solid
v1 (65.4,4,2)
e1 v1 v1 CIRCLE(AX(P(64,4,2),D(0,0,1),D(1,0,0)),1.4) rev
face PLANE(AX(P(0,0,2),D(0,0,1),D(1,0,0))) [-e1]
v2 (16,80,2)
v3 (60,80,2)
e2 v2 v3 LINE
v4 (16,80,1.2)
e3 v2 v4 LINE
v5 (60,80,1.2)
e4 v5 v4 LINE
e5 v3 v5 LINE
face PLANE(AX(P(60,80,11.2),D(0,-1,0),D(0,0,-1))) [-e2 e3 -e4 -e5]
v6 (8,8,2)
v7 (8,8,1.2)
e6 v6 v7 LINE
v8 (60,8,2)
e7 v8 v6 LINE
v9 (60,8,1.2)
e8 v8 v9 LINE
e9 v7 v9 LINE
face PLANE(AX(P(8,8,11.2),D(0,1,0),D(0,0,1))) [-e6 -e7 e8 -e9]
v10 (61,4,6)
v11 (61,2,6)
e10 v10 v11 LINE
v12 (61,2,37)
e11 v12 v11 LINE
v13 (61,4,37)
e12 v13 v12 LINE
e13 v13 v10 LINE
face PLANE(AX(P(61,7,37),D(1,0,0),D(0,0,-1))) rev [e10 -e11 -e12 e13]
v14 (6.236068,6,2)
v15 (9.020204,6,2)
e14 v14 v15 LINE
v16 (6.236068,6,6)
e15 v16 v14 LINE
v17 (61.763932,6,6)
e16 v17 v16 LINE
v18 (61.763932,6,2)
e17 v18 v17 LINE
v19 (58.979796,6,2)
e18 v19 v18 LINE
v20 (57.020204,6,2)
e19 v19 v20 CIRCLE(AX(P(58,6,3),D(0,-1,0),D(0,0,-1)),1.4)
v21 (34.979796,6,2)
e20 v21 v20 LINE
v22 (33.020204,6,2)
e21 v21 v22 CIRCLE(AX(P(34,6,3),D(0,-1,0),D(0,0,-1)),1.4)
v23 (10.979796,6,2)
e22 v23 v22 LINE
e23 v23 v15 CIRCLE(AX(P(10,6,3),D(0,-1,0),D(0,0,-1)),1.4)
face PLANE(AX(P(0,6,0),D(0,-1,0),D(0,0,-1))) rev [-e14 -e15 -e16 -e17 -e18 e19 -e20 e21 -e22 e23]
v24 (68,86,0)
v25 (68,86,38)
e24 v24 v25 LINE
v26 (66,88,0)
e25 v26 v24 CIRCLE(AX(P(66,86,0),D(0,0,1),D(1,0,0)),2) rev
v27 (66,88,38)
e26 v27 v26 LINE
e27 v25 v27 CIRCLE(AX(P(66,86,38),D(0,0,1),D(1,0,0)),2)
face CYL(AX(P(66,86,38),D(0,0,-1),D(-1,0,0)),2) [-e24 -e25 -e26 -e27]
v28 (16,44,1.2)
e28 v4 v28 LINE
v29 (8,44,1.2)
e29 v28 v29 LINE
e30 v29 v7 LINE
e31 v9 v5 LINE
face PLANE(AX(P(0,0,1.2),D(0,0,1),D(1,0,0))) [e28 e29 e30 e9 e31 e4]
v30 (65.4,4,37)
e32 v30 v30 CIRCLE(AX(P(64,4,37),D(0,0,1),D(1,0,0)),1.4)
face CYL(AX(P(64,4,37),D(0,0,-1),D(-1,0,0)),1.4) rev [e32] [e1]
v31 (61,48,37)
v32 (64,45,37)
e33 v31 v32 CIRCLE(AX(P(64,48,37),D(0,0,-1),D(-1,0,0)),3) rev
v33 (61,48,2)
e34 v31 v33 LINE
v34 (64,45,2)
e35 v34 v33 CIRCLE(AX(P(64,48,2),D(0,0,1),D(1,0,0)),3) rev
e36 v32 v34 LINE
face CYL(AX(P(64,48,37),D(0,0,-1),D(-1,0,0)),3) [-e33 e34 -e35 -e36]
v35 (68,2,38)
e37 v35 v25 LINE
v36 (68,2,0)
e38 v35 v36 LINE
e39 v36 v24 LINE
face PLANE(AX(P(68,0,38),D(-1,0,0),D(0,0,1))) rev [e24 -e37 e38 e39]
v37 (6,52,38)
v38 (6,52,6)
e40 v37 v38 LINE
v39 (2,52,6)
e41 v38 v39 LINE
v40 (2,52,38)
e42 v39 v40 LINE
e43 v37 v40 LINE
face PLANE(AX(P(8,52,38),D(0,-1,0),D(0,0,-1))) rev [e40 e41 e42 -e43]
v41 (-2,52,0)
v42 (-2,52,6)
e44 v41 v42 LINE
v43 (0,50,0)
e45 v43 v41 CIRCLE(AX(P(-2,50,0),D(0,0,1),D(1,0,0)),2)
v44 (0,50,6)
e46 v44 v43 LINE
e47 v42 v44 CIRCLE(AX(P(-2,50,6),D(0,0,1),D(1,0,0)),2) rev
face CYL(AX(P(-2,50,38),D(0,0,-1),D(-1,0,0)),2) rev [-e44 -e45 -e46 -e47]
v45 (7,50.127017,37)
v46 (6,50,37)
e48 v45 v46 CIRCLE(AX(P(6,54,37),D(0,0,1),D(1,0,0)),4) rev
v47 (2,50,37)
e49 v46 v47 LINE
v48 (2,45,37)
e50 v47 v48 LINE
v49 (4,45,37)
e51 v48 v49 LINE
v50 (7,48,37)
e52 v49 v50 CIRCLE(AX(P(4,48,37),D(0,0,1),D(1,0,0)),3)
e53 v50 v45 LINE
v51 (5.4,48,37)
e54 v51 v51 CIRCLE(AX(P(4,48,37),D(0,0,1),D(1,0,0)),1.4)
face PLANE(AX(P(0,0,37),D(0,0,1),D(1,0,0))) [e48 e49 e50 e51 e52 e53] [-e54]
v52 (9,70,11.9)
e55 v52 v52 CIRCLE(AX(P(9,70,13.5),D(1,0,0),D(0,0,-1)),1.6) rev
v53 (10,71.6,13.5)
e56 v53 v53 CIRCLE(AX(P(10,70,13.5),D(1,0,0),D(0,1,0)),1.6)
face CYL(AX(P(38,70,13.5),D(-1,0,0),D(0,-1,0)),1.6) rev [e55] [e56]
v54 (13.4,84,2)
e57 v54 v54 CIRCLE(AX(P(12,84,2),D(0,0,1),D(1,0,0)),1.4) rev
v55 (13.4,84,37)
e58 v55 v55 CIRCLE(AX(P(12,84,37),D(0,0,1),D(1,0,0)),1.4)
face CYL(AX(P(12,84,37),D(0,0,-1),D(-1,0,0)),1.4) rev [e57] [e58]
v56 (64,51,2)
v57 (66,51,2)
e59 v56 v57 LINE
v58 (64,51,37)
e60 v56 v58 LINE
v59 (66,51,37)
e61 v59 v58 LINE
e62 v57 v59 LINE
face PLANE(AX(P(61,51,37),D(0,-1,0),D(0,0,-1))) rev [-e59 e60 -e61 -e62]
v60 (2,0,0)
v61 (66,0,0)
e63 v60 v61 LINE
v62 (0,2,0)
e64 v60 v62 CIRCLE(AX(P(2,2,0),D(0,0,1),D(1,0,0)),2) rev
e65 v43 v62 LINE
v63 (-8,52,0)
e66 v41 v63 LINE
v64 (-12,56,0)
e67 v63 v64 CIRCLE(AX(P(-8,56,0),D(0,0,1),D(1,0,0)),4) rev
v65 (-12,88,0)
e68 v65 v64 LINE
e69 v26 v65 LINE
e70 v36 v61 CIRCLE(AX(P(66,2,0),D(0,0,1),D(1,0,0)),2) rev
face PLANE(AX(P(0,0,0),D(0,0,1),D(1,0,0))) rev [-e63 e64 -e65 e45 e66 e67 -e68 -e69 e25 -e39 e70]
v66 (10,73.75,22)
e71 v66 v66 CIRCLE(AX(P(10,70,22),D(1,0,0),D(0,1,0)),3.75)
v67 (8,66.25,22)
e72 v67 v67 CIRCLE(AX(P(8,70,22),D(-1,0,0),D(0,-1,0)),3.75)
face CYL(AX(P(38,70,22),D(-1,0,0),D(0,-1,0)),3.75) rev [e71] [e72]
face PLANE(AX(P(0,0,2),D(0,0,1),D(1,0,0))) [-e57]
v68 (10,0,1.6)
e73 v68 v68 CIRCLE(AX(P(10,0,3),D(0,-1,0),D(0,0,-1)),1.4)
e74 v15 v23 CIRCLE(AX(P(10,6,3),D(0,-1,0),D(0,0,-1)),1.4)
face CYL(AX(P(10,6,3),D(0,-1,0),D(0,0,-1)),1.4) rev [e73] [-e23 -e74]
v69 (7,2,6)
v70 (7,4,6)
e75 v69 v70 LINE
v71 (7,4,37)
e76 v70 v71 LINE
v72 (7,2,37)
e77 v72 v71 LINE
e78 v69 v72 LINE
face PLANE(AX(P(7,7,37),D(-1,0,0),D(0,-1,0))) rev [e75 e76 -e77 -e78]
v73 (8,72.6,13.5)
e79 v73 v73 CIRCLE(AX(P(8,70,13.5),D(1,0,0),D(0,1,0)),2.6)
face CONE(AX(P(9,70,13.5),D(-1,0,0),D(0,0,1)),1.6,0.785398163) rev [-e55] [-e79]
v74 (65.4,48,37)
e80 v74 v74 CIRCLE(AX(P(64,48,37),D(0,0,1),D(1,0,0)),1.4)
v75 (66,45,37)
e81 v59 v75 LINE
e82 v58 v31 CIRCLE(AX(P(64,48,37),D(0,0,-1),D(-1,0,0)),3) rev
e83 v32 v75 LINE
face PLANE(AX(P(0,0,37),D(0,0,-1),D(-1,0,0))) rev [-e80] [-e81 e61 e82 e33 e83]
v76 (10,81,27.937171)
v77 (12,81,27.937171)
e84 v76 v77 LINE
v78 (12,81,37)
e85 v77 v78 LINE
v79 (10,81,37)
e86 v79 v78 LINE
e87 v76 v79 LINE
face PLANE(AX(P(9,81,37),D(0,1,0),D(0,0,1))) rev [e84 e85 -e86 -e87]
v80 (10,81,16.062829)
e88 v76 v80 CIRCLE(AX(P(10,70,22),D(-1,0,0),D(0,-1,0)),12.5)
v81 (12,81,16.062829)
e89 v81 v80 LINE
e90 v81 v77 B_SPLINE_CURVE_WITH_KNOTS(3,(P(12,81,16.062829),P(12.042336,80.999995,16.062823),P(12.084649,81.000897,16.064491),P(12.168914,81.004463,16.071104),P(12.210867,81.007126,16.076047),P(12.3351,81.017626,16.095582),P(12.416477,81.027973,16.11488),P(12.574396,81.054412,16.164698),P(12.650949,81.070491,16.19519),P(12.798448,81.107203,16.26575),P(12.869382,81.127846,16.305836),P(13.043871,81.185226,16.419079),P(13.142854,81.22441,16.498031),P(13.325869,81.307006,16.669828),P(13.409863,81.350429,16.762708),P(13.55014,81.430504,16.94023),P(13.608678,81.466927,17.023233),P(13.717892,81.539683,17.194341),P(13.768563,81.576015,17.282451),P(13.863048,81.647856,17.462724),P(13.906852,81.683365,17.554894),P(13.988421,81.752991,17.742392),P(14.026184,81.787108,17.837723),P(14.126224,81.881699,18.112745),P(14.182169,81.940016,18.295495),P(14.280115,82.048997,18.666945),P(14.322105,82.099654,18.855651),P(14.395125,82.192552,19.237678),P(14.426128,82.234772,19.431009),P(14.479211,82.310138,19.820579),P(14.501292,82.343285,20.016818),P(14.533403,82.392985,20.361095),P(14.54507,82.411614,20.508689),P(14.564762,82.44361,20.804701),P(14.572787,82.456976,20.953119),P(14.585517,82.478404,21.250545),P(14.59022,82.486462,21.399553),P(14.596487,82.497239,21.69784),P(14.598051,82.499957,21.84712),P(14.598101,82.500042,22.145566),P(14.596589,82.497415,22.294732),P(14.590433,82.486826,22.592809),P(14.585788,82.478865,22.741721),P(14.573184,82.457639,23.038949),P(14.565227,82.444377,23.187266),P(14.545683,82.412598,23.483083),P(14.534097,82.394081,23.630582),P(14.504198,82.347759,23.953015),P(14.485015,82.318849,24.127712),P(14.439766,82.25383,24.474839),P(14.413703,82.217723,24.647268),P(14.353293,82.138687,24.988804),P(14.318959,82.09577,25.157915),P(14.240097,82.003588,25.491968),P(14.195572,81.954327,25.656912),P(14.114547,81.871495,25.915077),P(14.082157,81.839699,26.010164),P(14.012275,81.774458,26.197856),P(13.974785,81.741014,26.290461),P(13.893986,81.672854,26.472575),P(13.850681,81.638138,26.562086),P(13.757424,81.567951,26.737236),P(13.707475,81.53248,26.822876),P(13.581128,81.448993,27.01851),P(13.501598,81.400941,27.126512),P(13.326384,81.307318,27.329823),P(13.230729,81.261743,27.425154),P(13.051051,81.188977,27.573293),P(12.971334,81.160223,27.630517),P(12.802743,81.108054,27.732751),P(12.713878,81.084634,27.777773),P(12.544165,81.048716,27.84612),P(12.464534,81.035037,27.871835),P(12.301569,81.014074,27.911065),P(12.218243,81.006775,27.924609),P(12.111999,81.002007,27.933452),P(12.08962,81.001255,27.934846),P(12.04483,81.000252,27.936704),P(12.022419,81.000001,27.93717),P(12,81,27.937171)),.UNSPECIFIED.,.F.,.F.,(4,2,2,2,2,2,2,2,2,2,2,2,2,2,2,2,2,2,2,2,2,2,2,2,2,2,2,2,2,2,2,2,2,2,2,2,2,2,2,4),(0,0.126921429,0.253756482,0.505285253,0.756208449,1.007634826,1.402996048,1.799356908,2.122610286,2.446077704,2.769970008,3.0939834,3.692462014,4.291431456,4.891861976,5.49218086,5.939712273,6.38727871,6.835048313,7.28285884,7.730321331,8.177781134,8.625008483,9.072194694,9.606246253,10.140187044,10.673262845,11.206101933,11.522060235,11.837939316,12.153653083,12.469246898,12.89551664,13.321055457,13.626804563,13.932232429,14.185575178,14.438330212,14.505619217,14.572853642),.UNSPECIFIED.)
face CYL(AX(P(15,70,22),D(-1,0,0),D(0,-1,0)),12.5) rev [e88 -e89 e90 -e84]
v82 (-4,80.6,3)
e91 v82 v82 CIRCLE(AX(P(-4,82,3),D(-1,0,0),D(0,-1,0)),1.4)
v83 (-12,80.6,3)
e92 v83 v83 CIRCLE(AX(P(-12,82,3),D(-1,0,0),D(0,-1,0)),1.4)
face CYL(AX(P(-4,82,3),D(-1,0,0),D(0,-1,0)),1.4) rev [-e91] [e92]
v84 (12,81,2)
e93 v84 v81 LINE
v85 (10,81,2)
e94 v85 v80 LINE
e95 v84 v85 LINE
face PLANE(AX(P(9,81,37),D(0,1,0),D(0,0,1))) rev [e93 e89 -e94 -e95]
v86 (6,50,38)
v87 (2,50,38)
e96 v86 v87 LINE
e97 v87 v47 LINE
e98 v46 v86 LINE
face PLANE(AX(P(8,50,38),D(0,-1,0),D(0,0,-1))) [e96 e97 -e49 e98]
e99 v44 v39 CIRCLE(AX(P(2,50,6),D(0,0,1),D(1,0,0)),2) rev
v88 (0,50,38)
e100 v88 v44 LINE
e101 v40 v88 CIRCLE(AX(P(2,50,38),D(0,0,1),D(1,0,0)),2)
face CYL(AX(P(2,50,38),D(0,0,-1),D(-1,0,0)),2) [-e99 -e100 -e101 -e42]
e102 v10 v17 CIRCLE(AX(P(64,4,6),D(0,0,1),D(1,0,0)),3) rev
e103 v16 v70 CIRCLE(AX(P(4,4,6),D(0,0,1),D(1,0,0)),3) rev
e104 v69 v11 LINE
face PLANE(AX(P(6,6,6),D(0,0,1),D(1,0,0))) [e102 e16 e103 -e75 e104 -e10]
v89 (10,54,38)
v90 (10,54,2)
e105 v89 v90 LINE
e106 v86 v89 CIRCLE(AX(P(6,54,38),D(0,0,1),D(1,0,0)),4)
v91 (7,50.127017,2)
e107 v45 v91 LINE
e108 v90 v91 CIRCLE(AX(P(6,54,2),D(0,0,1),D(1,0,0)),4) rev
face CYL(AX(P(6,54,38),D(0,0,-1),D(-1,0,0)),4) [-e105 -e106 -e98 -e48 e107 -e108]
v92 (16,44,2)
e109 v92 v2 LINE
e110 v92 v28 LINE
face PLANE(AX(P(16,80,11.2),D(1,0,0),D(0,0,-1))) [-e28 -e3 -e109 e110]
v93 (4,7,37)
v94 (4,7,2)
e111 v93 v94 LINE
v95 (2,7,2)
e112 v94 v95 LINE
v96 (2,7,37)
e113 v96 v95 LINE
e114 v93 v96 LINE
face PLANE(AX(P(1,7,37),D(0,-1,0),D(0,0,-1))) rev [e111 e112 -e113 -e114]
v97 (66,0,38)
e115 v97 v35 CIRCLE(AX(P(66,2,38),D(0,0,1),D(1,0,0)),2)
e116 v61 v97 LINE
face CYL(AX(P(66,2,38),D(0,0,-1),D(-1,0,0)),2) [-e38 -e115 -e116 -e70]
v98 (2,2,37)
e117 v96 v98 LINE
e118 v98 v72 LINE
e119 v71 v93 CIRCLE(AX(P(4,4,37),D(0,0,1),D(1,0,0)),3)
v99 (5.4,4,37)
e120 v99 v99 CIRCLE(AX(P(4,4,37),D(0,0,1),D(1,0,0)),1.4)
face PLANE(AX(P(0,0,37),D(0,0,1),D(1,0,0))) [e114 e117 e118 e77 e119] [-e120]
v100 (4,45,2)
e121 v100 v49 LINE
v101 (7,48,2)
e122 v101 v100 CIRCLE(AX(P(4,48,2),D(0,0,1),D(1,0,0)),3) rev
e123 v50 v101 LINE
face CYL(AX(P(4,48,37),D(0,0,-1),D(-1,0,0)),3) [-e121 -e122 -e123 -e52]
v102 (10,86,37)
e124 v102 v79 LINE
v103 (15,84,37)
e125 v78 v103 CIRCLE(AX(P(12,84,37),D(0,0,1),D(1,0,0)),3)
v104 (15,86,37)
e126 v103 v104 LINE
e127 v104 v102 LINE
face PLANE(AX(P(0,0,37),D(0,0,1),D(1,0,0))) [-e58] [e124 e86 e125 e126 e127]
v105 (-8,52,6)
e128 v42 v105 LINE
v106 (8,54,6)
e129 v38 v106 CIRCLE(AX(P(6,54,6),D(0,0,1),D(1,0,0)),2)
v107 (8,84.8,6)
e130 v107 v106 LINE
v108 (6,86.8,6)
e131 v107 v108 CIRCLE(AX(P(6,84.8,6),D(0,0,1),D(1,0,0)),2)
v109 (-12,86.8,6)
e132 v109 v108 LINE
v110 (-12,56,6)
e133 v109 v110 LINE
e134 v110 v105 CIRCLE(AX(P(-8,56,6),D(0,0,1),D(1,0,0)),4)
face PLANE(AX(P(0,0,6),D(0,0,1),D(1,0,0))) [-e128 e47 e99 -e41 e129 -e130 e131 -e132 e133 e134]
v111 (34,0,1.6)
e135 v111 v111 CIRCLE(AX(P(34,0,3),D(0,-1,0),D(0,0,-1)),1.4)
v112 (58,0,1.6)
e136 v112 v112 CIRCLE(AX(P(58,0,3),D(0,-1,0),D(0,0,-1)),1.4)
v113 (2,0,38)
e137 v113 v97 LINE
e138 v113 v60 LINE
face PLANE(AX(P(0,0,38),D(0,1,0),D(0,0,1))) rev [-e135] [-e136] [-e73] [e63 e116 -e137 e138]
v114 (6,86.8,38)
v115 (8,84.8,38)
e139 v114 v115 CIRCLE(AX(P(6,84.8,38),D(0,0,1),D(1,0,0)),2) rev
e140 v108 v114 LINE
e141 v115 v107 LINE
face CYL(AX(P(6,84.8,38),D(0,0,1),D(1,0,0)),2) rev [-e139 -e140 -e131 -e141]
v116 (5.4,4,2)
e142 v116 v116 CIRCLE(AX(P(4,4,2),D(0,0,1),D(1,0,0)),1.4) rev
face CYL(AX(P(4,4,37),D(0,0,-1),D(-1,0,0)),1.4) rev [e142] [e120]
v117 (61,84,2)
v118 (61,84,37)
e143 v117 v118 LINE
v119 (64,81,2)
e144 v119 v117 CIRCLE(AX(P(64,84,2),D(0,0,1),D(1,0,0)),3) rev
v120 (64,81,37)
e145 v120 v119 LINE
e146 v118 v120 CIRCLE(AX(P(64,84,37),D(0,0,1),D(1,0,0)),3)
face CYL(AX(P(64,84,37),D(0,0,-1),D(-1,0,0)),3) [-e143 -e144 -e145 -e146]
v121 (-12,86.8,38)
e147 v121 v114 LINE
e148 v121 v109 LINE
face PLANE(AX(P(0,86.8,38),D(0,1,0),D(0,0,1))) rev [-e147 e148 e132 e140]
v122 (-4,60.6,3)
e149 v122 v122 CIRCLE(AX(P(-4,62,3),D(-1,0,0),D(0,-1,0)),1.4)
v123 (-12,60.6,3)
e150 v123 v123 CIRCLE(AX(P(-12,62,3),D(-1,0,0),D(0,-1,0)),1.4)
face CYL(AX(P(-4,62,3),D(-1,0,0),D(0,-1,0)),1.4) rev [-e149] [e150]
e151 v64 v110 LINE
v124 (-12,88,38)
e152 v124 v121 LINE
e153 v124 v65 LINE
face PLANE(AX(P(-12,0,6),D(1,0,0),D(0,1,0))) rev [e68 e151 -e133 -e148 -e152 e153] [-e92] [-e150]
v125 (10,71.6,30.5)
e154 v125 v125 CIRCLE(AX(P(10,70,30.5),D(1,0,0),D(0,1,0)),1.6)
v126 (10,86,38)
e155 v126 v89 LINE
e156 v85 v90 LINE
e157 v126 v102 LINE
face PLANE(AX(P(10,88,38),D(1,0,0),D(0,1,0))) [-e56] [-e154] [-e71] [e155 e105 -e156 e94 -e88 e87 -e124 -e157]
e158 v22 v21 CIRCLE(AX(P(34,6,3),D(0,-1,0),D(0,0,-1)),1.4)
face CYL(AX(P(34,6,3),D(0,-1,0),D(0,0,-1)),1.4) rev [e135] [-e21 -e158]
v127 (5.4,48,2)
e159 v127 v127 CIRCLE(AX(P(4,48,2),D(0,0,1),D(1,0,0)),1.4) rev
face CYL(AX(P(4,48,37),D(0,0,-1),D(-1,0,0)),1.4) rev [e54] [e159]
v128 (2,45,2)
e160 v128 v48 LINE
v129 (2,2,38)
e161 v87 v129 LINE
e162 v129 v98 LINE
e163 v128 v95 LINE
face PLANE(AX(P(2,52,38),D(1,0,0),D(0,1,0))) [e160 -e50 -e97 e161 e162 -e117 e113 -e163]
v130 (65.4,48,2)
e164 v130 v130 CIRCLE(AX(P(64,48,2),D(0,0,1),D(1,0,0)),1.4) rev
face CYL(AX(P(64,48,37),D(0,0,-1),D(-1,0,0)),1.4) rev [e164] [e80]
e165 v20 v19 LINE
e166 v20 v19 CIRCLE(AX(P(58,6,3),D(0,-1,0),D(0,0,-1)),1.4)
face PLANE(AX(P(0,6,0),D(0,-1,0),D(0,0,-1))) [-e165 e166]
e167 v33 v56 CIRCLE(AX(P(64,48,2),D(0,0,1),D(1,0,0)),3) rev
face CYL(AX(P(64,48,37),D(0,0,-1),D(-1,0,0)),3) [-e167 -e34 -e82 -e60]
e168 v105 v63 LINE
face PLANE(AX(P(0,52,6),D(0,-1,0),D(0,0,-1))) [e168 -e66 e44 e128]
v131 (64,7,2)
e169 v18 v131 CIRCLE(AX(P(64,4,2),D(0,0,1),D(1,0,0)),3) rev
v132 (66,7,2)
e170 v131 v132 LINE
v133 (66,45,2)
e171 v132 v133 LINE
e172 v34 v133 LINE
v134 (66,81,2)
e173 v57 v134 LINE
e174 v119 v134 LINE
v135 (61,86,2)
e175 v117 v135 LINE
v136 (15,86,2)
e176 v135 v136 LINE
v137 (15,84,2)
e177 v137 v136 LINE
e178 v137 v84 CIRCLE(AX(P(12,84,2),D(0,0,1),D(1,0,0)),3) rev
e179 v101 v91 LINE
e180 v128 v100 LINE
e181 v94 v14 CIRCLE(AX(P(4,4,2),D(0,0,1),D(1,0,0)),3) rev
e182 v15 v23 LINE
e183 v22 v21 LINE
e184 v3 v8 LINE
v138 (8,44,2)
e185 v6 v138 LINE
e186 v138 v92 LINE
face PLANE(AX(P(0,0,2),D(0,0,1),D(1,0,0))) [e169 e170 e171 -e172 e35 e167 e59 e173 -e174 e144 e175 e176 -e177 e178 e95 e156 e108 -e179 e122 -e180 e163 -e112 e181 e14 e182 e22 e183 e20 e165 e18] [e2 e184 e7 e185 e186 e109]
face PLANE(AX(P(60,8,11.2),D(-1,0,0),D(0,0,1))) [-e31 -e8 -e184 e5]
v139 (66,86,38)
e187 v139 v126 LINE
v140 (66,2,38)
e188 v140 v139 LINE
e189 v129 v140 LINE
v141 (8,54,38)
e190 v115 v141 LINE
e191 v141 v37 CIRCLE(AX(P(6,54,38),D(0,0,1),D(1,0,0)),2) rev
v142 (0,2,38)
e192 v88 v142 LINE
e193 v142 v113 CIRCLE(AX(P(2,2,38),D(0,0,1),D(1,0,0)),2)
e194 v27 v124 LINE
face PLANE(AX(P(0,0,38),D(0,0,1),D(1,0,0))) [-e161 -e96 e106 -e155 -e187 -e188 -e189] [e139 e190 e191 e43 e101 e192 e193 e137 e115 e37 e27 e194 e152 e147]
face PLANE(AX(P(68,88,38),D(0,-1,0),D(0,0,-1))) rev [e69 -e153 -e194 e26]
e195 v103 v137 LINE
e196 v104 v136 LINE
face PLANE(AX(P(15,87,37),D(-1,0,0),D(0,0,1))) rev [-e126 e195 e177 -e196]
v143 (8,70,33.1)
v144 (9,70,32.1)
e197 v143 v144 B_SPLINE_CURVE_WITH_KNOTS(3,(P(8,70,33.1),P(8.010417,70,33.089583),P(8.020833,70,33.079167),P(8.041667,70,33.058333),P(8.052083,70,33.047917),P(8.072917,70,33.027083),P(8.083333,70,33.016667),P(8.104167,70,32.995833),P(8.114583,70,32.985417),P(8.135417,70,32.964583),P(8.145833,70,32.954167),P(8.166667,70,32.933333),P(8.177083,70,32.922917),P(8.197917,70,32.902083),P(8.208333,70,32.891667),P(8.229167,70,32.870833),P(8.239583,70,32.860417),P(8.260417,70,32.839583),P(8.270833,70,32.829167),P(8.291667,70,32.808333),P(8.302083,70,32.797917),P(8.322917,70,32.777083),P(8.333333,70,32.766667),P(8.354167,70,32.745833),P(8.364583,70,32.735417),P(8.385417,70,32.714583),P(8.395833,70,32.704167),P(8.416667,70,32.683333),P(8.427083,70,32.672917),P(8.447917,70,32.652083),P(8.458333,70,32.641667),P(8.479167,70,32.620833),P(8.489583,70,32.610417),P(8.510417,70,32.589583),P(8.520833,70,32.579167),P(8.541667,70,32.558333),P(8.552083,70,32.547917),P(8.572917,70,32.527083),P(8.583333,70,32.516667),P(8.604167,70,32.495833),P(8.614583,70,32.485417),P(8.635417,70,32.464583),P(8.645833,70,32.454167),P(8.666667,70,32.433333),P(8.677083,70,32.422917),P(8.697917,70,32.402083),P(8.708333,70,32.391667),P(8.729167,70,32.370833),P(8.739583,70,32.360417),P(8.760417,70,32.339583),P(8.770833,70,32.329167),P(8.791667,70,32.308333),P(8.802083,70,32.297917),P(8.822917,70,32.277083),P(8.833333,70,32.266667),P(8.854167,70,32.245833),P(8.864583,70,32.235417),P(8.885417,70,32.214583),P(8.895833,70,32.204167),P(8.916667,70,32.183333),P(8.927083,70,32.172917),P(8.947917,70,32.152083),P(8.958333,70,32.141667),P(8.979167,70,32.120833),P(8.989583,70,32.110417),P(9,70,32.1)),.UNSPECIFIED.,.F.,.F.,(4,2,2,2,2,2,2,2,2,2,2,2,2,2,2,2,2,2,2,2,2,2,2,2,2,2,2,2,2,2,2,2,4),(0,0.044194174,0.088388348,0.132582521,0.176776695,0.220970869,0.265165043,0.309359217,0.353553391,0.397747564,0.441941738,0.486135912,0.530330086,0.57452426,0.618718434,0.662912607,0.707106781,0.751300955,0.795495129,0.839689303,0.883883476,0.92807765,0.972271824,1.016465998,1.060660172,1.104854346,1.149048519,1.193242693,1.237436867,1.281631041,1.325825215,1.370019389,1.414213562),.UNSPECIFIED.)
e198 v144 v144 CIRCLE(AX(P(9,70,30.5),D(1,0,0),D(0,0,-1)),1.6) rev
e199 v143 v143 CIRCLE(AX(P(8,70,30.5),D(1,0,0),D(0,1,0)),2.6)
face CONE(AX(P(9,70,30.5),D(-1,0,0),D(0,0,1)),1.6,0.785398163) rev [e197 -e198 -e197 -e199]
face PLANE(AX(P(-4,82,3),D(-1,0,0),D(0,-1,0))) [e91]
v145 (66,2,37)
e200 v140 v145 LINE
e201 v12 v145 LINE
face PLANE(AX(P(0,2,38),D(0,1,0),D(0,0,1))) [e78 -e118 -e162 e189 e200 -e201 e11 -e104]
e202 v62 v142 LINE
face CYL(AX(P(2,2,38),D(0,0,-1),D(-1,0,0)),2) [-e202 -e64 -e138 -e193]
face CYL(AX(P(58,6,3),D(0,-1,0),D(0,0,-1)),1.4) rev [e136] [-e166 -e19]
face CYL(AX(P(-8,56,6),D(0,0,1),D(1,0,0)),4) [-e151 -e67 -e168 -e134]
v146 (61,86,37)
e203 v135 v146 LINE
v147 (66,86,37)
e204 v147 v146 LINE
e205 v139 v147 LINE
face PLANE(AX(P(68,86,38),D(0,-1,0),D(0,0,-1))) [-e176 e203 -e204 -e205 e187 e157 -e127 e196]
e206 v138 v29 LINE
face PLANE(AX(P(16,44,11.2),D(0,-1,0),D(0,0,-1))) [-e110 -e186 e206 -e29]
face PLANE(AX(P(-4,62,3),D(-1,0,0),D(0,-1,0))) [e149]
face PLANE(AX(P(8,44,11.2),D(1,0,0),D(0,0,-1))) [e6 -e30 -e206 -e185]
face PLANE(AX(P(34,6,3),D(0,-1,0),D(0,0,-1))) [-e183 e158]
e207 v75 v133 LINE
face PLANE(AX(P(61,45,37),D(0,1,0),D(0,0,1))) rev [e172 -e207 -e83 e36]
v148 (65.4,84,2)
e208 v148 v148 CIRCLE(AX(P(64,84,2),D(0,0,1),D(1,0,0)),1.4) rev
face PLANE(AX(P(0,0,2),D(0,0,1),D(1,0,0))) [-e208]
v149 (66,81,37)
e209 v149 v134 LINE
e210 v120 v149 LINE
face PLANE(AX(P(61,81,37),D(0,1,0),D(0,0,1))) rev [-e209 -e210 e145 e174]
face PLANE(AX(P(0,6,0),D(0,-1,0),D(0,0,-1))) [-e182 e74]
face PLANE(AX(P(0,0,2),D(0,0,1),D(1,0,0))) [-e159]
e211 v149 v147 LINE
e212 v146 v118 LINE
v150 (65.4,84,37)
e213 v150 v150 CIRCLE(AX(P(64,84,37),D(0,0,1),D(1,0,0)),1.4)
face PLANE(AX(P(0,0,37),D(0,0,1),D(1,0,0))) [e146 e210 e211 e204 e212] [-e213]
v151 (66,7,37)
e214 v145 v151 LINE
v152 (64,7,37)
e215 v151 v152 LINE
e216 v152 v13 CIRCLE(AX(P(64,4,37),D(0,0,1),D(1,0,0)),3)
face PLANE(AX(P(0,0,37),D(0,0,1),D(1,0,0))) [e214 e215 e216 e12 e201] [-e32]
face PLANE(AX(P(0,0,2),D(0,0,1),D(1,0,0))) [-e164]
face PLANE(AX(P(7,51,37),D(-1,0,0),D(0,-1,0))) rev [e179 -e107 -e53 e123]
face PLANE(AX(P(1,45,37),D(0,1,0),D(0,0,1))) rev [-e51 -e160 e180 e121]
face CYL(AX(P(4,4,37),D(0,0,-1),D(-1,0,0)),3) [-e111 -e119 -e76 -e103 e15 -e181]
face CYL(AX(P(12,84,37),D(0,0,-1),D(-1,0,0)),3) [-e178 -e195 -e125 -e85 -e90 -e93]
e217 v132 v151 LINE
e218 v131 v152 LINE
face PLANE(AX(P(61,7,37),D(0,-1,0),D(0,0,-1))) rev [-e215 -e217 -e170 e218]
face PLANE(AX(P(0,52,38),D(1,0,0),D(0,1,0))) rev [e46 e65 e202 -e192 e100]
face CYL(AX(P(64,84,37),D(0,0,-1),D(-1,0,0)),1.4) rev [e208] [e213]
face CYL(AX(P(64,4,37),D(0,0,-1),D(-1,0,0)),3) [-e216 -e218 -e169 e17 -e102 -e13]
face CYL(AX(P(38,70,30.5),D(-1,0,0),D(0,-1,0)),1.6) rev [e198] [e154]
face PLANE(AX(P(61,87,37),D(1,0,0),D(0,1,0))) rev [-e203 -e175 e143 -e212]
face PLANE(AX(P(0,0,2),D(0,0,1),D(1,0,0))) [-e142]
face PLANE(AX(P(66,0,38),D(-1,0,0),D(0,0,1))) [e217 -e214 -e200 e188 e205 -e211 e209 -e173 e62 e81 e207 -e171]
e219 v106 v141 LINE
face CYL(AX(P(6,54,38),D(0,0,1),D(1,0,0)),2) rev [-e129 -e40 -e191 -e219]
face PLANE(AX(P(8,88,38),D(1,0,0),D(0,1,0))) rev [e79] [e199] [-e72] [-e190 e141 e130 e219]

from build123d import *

# Parameters (mm, degrees)
EXTRUDE_1_DEPTH     = 38
SHELL_1_T           = -2
SKETCH_9_W          = 20
SKETCH_9_H          = 34.8
EXTRUDE_3_DEPTH     = 6
SKETCH_9_3_W        = 20
SKETCH_9_3_H        = 1.2
EXTRUDE_4_DEPTH     = 38
FILLET_1_R          = 2
FILLET_2_R          = 4
FILLET_4_R          = 2
SKETCH_3_W          = 6
SKETCH_3_H          = 6
SKETCH_3_R          = 1.4
EXTRUDE_2_DEPTH     = 35
FILLET_3_R          = 3
SKETCH_2_R          = 3.75
SKETCH_2_R_2        = 1.6
CUT_EXTRUDE_1_DEPTH = 30
CHAMFER_1_SIZE      = 1
CUT_EXTRUDE_START   = -2
SKETCH_2_3_R        = 12.5
CUT_EXTRUDE_2_DEPTH = 5
CUT_EXTRUDE_START_2 = 1.2
CUT_EXTRUDE_4_DEPTH = 10
SKETCH_10_R         = 1.4
CUT_EXTRUDE_5_DEPTH = 8
SKETCH_11_W         = 56
SKETCH_11_H         = 6
SKETCH_11_R         = 1.4
EXTRUDE_5_DEPTH     = 6
SKETCH_11_2_R       = 1.4
CUT_EXTRUDE_6_DEPTH = 6


with BuildPart() as part:
    # 草图1 → 凸台-拉伸1 (new body)
    with BuildSketch(Plane.XY):
        Polygon((0, 0), (68, 0), (68, 88), (8, 88), (8, 52), (0, 52), align=None)
    extrude(amount=EXTRUDE_1_DEPTH)

    # 抽壳1
    shell_1_openings = [part.faces().sort_by_distance(p)[0] for p in [
        (35.516853933, 42.685393258, 38),
    ]]
    offset(amount=SHELL_1_T, openings=shell_1_openings, kind=Kind.INTERSECTION)

    # 草图9 → 凸台-拉伸3 (add)
    with BuildSketch(Plane.XY):
        with Locations((-2, 69.4)):
            Rectangle(SKETCH_9_W, SKETCH_9_H)
    extrude(amount=EXTRUDE_3_DEPTH)

    # 草图9<3> → 凸台-拉伸4 (add)
    with BuildSketch(Plane.XY):
        with Locations((-2, 87.4)):
            Rectangle(SKETCH_9_3_W, SKETCH_9_3_H)
    extrude(amount=EXTRUDE_4_DEPTH)

    # 圆角1
    fillet_1_edges = [part.edges().sort_by_distance(p)[0] for p in [
        (0, 0, 19),
        (8, 52, 22),
        (68, 88, 19),
        (68, 0, 19),
        (0, 52, 3),
        (8, 86.8, 22),
    ]]
    fillet(fillet_1_edges, radius=FILLET_1_R)

    # 圆角2
    fillet_2_edges = [part.edges().sort_by_distance(p)[0] for p in [
        (10, 50, 20),
        (-12, 52, 3),
    ]]
    fillet(fillet_2_edges, radius=FILLET_2_R)

    # 圆角4
    fillet_4_edges = [part.edges().sort_by_distance(p)[0] for p in [
        (0, 52, 22),
    ]]
    fillet(fillet_4_edges, radius=FILLET_4_R)

    # 草图3 → 凸台-拉伸2 (add)
    # profile 1 of 6: a face of its own
    with BuildSketch(Plane.XY.offset(2)):
        with Locations((64, 84)):
            Rectangle(SKETCH_3_W, SKETCH_3_H)
        with Locations((64, 84)):
            Circle(SKETCH_3_R, mode=Mode.SUBTRACT)
    # profile 2 of 6: a face of its own
    with BuildSketch(Plane.XY.offset(2)):
        with Locations((12, 84)):
            Rectangle(SKETCH_3_W, SKETCH_3_H)
        with Locations((12, 84)):
            Circle(SKETCH_3_R, mode=Mode.SUBTRACT)
    # profile 3 of 6: a face of its own
    with BuildSketch(Plane.XY.offset(2)):
        with Locations((64, 4)):
            Rectangle(SKETCH_3_W, SKETCH_3_H)
        with Locations((64, 4)):
            Circle(SKETCH_3_R, mode=Mode.SUBTRACT)
    # profile 4 of 6: a face of its own
    with BuildSketch(Plane.XY.offset(2)):
        with Locations((4, 48)):
            Rectangle(SKETCH_3_W, SKETCH_3_H)
        with Locations((4, 48)):
            Circle(SKETCH_3_R, mode=Mode.SUBTRACT)
    # profile 5 of 6: a face of its own
    with BuildSketch(Plane.XY.offset(2)):
        with Locations((4, 4)):
            Rectangle(SKETCH_3_W, SKETCH_3_H)
        with Locations((4, 4)):
            Circle(SKETCH_3_R, mode=Mode.SUBTRACT)
    # profile 6 of 6: a face of its own
    with BuildSketch(Plane.XY.offset(2)):
        with Locations((64, 48)):
            Rectangle(SKETCH_3_W, SKETCH_3_H)
        with Locations((64, 48)):
            Circle(SKETCH_3_R, mode=Mode.SUBTRACT)
    extrude(amount=EXTRUDE_2_DEPTH)

    # 圆角3
    fillet_3_edges = [part.edges().sort_by_distance(p)[0] for p in [
        (15, 81, 19.5),
        (61, 81, 19.5),
        (61, 7, 19.5),
        (7, 45, 19.5),
        (7, 7, 19.5),
        (61, 45, 19.5),
        (61, 51, 19.5),
    ]]
    fillet(fillet_3_edges, radius=FILLET_3_R - 0.0001)  # a hair under: the kernel refuses the full size

    # 草图2 → 切除-拉伸1 (cut)
    with BuildSketch(Plane.ZY.offset(-8)):
        with Locations(Location((22, 70, 0), (0, 0, 270))):
            Circle(SKETCH_2_R)
        with Locations(Location((30.5, 70, 0), (0, 0, 270))):
            Circle(SKETCH_2_R_2)
        with Locations(Location((13.5, 70, 0), (0, 0, 270))):
            Circle(SKETCH_2_R_2)
    extrude(amount=-CUT_EXTRUDE_1_DEPTH, mode=Mode.SUBTRACT)

    # 倒角1
    chamfer_1_edges = [part.edges().sort_by_distance(p)[0] for p in [
        (8, 71.6, 13.5),
        (8, 71.6, 30.5),
    ]]
    chamfer(chamfer_1_edges, length=CHAMFER_1_SIZE)

    # 草图2<3> → 切除-拉伸2 (cut)
    with BuildSketch(Plane.ZY.offset(-8).offset(CUT_EXTRUDE_START)):
        with Locations((22, 70)):
            Circle(SKETCH_2_3_R)
    extrude(amount=-CUT_EXTRUDE_2_DEPTH, mode=Mode.SUBTRACT)

    # 草图1<3> → 切除-拉伸4 (cut)
    with BuildSketch(Plane.XY.offset(CUT_EXTRUDE_START_2)):
        Polygon((8, 44), (8, 8), (60, 8), (60, 80), (16, 80), (16, 44), align=None)
    extrude(amount=CUT_EXTRUDE_4_DEPTH, mode=Mode.SUBTRACT)

    # 草图10 → 切除-拉伸5 (cut)
    with BuildSketch(Plane.ZY.offset(12)):
        with Locations(Location((3, 82, 0), (0, 0, 270))):
            Circle(SKETCH_10_R)
        with Locations(Location((3, 62, 0), (0, 0, 270))):
            Circle(SKETCH_10_R)
    extrude(amount=-CUT_EXTRUDE_5_DEPTH, mode=Mode.SUBTRACT)

    # 草图11 → 凸台-拉伸5 (add)
    with BuildSketch(Plane.XZ):
        with Locations((34, 3)):
            Rectangle(SKETCH_11_W, SKETCH_11_H)
        with Locations((10, 3)):
            Circle(SKETCH_11_R, mode=Mode.SUBTRACT)
        with Locations((34, 3)):
            Circle(SKETCH_11_R, mode=Mode.SUBTRACT)
        with Locations((58, 3)):
            Circle(SKETCH_11_R, mode=Mode.SUBTRACT)
    extrude(amount=-EXTRUDE_5_DEPTH)

    # 草图11<2> → 切除-拉伸6 (cut)
    with BuildSketch(Plane.XZ):
        with Locations(Location((10, 3, 0), (0, 0, 270))):
            Circle(SKETCH_11_2_R)
        with Locations(Location((58, 3, 0), (0, 0, 270))):
            Circle(SKETCH_11_2_R)
        with Locations(Location((34, 3, 0), (0, 0, 270))):
            Circle(SKETCH_11_2_R)
    extrude(amount=-CUT_EXTRUDE_6_DEPTH, mode=Mode.SUBTRACT)


solid = part.part
